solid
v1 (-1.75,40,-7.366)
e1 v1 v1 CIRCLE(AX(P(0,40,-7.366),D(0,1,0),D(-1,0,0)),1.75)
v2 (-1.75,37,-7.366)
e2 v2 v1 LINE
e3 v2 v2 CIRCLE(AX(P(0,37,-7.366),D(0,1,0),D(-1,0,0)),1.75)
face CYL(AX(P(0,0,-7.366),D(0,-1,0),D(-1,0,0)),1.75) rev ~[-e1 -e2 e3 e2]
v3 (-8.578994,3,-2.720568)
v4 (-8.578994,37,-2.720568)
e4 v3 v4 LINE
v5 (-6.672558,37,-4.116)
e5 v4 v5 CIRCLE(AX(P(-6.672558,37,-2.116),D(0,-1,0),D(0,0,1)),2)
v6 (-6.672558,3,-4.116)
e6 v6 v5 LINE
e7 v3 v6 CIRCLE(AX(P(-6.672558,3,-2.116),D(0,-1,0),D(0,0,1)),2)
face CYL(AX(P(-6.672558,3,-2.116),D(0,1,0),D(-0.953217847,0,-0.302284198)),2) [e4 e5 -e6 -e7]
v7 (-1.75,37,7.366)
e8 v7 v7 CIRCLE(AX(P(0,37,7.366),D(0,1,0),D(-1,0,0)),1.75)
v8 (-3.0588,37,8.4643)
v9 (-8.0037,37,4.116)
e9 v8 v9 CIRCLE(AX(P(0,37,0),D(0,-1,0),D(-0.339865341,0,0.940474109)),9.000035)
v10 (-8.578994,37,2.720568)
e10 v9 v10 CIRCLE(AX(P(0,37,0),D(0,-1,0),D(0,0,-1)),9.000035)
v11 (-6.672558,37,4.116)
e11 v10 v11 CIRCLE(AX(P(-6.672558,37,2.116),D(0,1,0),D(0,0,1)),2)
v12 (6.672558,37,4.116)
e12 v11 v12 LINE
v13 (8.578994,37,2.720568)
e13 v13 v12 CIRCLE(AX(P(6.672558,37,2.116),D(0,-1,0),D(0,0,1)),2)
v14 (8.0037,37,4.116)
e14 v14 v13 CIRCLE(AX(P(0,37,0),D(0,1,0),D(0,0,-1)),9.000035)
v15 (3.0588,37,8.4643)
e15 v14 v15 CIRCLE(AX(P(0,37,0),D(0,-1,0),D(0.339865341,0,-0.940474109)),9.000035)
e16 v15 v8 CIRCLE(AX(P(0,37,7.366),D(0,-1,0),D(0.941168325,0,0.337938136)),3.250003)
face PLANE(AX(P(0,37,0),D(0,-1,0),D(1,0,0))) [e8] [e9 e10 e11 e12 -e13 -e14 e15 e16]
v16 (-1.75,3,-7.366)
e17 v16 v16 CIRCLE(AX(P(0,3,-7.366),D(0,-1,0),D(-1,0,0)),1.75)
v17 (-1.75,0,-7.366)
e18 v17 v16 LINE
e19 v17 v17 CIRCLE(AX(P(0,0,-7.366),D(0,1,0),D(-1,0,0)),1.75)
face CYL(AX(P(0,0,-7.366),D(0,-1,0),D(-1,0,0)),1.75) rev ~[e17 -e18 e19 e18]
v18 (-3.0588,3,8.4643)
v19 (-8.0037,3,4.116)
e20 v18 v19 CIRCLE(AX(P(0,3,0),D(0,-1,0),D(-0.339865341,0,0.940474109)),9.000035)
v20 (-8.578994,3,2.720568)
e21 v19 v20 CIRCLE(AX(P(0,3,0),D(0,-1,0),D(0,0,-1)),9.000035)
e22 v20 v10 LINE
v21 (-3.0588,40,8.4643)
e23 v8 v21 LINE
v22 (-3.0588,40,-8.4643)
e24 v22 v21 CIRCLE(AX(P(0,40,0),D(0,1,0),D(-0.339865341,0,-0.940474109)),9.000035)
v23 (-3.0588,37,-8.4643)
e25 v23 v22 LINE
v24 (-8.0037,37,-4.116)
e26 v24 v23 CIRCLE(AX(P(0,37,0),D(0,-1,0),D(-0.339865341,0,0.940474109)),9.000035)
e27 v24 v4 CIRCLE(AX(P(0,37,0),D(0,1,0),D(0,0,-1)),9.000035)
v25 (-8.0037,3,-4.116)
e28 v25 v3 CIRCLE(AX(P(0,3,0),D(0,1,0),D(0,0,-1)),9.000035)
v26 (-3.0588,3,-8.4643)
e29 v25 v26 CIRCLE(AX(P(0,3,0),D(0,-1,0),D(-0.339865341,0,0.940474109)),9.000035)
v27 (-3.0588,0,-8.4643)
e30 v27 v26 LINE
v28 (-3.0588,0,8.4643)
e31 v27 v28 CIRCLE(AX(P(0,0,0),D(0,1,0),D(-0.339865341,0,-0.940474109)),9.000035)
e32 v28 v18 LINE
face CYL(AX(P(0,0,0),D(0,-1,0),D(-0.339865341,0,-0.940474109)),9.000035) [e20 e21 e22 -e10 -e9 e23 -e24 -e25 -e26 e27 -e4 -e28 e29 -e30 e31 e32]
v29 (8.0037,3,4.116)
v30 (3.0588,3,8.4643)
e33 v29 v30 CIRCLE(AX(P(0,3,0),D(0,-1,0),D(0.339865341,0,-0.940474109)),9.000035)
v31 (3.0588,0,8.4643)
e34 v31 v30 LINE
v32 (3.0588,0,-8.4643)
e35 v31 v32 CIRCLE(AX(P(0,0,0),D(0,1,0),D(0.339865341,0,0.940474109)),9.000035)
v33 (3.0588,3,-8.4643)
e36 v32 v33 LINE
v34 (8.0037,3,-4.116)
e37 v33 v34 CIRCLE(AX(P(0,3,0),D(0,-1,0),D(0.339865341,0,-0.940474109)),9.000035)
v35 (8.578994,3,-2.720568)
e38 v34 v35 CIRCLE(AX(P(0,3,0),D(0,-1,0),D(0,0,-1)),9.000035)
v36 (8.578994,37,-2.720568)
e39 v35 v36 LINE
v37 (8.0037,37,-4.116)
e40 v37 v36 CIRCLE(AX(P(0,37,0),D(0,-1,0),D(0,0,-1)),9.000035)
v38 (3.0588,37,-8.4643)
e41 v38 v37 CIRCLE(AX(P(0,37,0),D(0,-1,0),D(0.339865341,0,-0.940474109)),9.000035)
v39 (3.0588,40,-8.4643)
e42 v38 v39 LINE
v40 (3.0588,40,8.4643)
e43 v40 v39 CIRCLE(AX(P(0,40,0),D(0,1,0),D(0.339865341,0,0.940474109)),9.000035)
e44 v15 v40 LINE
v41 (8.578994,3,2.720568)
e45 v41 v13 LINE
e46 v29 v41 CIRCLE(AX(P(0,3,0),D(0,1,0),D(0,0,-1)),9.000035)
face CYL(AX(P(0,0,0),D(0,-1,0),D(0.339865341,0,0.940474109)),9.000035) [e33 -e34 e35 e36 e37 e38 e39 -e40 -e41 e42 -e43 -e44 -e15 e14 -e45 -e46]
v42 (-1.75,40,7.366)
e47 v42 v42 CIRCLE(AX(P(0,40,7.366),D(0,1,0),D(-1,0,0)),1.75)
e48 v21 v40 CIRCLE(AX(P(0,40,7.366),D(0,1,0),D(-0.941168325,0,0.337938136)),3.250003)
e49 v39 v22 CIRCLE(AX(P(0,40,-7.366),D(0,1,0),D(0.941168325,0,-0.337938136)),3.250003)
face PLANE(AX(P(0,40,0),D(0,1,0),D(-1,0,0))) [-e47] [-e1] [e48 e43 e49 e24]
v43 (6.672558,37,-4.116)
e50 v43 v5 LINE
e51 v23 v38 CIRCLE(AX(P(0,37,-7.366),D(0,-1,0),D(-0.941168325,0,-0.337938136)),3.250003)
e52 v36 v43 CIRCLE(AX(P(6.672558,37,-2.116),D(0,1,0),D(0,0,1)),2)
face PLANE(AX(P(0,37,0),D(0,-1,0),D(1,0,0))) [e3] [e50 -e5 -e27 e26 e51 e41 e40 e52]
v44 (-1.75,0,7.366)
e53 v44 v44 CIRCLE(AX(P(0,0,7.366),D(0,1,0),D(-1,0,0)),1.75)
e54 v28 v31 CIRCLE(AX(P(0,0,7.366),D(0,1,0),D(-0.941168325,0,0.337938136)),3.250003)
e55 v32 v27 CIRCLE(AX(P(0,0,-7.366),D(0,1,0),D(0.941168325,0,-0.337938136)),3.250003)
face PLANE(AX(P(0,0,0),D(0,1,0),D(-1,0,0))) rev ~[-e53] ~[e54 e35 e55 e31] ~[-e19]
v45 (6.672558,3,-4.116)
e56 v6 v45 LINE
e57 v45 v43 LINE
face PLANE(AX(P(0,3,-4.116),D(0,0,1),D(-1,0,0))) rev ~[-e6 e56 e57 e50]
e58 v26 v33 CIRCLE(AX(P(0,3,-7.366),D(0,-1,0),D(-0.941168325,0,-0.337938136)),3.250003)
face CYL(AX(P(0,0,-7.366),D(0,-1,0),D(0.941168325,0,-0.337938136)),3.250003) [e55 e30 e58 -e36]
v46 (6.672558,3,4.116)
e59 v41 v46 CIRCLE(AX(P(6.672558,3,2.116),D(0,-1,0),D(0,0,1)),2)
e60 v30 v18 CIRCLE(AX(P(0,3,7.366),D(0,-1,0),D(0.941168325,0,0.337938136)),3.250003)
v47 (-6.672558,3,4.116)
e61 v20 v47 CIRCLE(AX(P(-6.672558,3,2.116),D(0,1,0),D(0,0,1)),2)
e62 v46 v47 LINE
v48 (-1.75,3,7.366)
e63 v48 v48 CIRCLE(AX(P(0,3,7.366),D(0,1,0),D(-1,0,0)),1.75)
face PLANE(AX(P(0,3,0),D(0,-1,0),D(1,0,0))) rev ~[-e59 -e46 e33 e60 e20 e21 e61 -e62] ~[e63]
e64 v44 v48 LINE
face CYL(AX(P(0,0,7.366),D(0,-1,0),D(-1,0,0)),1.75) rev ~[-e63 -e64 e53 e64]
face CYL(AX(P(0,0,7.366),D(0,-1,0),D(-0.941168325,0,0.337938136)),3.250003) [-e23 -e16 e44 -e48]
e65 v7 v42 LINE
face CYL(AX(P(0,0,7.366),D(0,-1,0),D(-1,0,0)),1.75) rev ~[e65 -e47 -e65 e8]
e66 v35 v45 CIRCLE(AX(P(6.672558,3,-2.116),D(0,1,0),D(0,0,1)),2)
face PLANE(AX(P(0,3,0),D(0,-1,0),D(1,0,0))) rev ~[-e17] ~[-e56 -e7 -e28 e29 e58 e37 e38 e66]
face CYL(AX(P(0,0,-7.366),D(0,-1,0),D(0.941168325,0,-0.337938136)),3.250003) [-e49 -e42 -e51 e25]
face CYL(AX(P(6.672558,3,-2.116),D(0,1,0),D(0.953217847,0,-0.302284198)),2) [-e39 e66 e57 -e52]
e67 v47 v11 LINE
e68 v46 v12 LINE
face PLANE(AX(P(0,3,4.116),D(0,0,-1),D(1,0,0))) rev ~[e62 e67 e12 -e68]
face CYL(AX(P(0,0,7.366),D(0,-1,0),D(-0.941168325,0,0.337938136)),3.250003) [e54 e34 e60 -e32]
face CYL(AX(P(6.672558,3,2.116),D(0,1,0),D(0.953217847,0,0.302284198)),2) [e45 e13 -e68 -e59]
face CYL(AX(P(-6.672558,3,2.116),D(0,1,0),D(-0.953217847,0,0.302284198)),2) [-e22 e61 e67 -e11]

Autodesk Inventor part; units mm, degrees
ref_plane "YZ Plane" through (0, 0, 0) normal (1, 0, 0) x (0, 1, 0)
ref_plane "XZ Plane" through (0, 0, 0) normal (0, 1, 0) x (-1, 0, 0)
sketch "Sketch1" plane through (0, 0, 0) normal (0, 1, 0) x (-1, 0, 0)
  circle A0 centre (0, 7.366) radius 1.75
  circle A1 centre (0, -7.366) radius 1.75
  arc A2 (3.0588, -8.4643) -> (3.0588, 8.4643) centre (0, 0) ccw
  arc A3 (-3.0588, 8.4643) -> (-3.0588, -8.4643) centre (0, 0) ccw
  arc A4 (3.0588, 8.4643) -> (-3.0588, 8.4643) centre (0, 7.366) ccw
  arc A5 (-3.0588, -8.4643) -> (3.0588, -8.4643) centre (0, -7.366) ccw
  point P0 (9, 0)
extrude "Extrusion1" add sketch "Sketch1" along normal blind 40
ref_plane "Work Plane1" through (0, 3, 0) normal (0, -1, 0) x (1, 0, 0)
sketch "Sketch2" plane through (0, 3, 0) normal (0, -1, 0) x (1, 0, 0)
  circle A0 centre (0, -7.366) radius 1.75
  circle A1 centre (0, 7.366) radius 1.75
  arc A2 (3.0588, -8.4643) -> (3.0588, 8.4643) centre (0, 0) ccw
  arc A3 (3.0588, 8.4643) -> (-3.0588, 8.4643) centre (0, 7.366) ccw
  arc A4 (-3.0588, 8.4643) -> (-3.0588, -8.4643) centre (0, 0) ccw
  arc A5 (-3.0588, -8.4643) -> (3.0588, -8.4643) centre (0, -7.366) ccw
  arc A6 (3.0588, 8.4643) -> (-3.0588, 8.4643) centre (0, 7.366) ccw
  arc A7 (-3.0588, -8.4643) -> (3.0588, -8.4643) centre (0, -7.366) ccw
  line L0 (0, 4.116) -> (8.0037, 4.116)
  line L1 (0, 4.116) -> (-8.0037, 4.116)
  line L2 (0, -4.116) -> (8.0037, -4.116)
  line L3 (0, -4.116) -> (-8.0037, -4.116)
extrude "Extrusion2" cut sketch "Sketch2" against normal blind 34 contours A5 A4 L3 L2 A2 | L0 L1 A4 A3 A2
fillet "Fillet1" radius 2 4 edges at (8.0037, 20, 4.116) (-8.0037, 20, 4.116) (8.0037, 20, -4.116) (-8.0037, 20, -4.116)
properties part number "Ball Caster Spacer"
